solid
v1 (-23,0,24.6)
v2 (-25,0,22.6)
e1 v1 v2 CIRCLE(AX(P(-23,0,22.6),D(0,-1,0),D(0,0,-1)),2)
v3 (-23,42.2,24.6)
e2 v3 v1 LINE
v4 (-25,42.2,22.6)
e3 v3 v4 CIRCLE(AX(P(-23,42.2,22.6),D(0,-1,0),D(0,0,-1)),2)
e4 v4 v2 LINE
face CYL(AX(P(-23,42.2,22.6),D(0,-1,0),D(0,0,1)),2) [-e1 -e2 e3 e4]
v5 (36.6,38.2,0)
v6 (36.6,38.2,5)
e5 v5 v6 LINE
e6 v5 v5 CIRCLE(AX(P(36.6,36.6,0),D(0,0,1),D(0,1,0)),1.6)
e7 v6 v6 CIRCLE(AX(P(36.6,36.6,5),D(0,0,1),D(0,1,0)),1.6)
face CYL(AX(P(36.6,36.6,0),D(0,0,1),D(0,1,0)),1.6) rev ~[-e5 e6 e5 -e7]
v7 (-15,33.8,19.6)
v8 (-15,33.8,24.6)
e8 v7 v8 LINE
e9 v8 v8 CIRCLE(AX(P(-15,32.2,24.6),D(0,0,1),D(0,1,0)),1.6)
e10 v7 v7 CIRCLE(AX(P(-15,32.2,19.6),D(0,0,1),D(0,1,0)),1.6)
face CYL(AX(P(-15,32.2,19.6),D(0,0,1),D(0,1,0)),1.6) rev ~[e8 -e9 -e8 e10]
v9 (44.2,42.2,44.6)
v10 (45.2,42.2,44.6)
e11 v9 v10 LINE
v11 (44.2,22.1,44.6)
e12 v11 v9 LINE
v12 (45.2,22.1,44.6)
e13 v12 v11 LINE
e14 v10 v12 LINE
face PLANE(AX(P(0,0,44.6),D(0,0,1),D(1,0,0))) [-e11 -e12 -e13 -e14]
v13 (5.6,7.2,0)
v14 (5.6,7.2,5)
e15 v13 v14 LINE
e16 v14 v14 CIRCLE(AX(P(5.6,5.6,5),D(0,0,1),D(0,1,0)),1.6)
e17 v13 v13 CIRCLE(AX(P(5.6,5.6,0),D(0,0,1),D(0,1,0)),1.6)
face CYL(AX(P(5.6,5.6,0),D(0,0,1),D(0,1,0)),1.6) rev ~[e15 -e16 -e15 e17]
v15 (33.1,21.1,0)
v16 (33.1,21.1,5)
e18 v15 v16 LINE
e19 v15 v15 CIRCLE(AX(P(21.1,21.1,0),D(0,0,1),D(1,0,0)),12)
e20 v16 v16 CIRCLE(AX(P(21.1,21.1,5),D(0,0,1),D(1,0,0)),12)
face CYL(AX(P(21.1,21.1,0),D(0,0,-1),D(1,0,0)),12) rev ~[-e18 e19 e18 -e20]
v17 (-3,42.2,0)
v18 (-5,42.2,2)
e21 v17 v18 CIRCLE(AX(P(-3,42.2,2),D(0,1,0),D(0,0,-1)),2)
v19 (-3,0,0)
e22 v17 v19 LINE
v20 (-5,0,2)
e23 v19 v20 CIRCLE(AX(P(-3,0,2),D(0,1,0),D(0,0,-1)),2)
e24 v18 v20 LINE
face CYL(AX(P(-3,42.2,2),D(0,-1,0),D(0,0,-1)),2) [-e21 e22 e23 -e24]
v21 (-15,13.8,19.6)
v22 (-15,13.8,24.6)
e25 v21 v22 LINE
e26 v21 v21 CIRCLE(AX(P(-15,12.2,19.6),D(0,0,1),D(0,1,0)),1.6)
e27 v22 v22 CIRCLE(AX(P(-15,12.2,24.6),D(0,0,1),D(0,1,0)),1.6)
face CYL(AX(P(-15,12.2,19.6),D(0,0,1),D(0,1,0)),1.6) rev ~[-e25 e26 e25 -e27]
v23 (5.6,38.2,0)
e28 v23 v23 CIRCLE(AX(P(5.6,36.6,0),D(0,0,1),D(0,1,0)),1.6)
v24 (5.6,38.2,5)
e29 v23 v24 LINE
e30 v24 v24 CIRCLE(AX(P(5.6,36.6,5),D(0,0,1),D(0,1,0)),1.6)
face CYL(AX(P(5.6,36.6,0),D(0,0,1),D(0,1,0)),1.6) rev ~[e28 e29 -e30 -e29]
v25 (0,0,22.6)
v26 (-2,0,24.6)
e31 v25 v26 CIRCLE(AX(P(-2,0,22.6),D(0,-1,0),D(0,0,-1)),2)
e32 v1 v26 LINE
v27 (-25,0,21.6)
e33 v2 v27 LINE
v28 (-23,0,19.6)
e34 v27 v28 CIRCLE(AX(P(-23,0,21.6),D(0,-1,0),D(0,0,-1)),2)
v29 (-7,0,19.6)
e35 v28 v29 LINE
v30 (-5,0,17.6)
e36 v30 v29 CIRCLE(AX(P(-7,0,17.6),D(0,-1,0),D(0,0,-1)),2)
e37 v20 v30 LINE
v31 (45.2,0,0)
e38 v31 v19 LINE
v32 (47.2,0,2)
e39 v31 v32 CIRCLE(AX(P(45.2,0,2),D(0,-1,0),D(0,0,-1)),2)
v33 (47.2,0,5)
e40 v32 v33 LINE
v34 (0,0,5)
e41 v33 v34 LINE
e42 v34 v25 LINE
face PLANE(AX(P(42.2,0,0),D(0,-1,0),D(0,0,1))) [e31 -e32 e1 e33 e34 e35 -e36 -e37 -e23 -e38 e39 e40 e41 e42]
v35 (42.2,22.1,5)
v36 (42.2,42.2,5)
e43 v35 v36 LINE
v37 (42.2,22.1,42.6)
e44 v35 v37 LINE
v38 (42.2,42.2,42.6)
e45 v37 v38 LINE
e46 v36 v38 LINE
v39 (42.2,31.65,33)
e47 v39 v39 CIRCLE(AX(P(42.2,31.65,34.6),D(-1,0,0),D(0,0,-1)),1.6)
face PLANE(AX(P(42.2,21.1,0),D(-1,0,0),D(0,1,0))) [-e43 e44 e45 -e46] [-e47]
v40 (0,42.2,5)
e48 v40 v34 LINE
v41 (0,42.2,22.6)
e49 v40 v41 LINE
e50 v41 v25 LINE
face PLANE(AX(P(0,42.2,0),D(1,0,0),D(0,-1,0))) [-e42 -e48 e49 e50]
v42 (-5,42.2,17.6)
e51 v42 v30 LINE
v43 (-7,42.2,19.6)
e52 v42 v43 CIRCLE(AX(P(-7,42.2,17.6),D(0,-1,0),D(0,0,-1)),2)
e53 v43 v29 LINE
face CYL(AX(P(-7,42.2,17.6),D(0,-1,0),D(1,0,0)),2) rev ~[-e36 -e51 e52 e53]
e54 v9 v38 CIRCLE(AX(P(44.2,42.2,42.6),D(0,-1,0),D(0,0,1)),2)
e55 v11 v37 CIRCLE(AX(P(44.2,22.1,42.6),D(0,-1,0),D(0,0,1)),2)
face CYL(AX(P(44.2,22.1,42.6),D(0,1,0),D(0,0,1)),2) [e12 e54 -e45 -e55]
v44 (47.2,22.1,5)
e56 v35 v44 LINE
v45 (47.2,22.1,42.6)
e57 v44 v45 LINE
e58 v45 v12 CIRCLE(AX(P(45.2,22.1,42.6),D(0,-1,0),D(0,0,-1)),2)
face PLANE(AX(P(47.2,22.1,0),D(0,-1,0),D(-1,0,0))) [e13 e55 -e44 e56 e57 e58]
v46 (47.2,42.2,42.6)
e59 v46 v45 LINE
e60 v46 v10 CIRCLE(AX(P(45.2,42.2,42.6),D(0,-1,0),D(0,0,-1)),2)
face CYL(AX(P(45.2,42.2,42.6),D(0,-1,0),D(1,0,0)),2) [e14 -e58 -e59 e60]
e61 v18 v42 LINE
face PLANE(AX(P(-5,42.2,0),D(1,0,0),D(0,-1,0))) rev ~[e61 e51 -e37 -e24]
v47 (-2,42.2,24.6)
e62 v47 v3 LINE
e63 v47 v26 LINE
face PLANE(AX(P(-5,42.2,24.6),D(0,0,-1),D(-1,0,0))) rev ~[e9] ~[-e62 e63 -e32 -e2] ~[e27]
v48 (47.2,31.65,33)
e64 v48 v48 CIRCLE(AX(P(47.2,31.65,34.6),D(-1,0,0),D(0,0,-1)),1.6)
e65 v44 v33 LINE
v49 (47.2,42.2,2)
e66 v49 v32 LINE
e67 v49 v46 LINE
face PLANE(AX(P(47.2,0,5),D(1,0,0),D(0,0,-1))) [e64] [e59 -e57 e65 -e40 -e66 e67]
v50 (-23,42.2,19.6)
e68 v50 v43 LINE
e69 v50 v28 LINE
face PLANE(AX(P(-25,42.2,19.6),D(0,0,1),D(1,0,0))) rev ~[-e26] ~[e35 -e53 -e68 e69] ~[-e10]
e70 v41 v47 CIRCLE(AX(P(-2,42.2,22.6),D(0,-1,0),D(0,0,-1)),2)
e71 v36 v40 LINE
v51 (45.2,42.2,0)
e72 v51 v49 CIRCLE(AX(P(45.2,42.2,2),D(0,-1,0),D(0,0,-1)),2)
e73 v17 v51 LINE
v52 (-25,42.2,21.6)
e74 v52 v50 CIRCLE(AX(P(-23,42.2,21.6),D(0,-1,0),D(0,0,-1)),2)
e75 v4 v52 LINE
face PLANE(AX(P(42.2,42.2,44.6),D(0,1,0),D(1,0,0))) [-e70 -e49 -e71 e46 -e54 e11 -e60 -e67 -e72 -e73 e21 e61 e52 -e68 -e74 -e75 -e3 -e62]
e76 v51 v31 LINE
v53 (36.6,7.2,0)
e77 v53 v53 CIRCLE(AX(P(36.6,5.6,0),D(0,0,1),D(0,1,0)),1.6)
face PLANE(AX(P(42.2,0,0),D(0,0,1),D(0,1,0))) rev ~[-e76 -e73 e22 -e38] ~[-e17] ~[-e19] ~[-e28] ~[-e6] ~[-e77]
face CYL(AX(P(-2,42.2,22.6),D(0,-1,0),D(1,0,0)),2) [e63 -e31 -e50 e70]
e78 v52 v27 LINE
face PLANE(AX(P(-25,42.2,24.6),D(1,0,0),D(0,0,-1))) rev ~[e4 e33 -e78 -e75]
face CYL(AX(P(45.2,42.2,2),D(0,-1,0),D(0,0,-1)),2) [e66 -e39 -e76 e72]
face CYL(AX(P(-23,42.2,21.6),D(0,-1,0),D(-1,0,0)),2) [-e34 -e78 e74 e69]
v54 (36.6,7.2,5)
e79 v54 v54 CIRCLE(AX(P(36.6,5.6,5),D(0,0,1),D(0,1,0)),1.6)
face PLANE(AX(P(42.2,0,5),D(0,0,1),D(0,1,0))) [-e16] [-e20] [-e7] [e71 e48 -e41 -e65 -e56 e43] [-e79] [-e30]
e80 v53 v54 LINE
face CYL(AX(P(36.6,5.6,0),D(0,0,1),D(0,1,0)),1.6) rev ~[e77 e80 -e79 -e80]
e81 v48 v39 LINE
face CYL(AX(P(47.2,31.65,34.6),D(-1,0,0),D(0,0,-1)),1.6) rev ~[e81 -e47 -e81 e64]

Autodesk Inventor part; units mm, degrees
ref_plane "YZ Plane" through (0, 0, 0) normal (1, 0, 0) x (0, 1, 0)
ref_plane "XZ Plane" through (0, 0, 0) normal (0, 1, 0) x (-1, 0, 0)
ref_plane "XY Plane" through (0, 0, 0) normal (0, 0, 1) x (1, 0, 0)
sketch "Sketch1" plane through (0, 0, 0) normal (0, 0, 1) x (1, 0, 0)
  line L0 (0, 0) -> (42.2, 0)
  line L1 (42.2, 0) -> (42.2, 42.2)
  line L2 (42.2, 42.2) -> (0, 42.2)
  line L3 (0, 42.2) -> (0, 0)
  line L4 (0, 0) -> (5, 0)
  line L5 (42.2, 0) -> (45, 0)
  line L6 (5.6, 36.6) -> (36.6, 36.6) construction
  line L7 (36.6, 36.6) -> (36.6, 5.6) construction
  line L8 (36.6, 5.6) -> (5.6, 5.6) construction
  line L9 (5.6, 5.6) -> (5.6, 36.6) construction
  circle A0 centre (21.1, 21.1) radius 12
  line L10 (0.1, 42.1) -> (42.1, 42.1)
  line L11 (42.1, 42.1) -> (42.1, 0.1)
  line L12 (42.1, 0.1) -> (0.1, 0.1)
  line L13 (0.1, 0.1) -> (0.1, 42.1)
  line L14 (42.2, 42.2) -> (47.2, 42.2)
  line L15 (47.2, 42.2) -> (47.2, 21.1)
  line L16 (47.2, 21.1) -> (42.2, 21.1)
  line L17 (42.2, 21.1) -> (42.2, 42.2)
  line L18 (0, 42.2) -> (-5, 42.2)
  line L19 (-5, 42.2) -> (-5, 0)
  line L20 (-5, 0) -> (0, 0)
  line L21 (0, 0) -> (0, 42.2)
  point P0 (36.6, 21.1)
  point P1 (42.1, 21.1)
  point P2 (21.1, 36.6)
  point P3 (21.1, 42.1)
  point P4 (21.1, 42.2)
  dimension "d0" = 31
  dimension "d1" = 42
  dimension "d5" = 0.1
  dimension "d6" = 0.1
  dimension "d7" = 24
  dimension "d32" = 5
  dimension "d37" = 5
extrude "Extrusion2" add sketch "Sketch1" along normal blind 5 contours L3 L2 L1 L0 | L10 L11 L12 L13
extrude "Extrusion4" add sketch "Sketch1" along normal blind 44.6 contours L14 L15 L16 L1
extrude "Extrusion5" add sketch "Sketch1" along normal blind 24.6 contours L20 L19 L18 L3
hole "Hole1" at (5.6, 36.6, 0) at (36.6, 36.6, 0) at (36.6, 5.6, 0) at (5.6, 5.6, 0) direction (0, 0, 1) diameter 3.2 end through all
sketch "Sketch4" plane through (42.2, 42.2, 44.6) normal (0, 1, 0) x (1, 0, 0)
  line L0 (-47.2, 20) -> (-67.2, 20)
  line L1 (-67.2, 20) -> (-67.2, 25)
  line L2 (-67.2, 25) -> (-47.2, 25)
  line L3 (-47.2, 25) -> (-47.2, 20)
  point P0 (-42.2, 44.6)
  dimension "d42" = 20
  dimension "d43" = 5
extrude "Extrusion6" add sketch "Sketch4" against normal up to surface (42.2 mm away)
sketch "Sketch5" plane through (47.2, 21.1, 44.6) normal (1, 0, 0) x (0, 0, -1)
  line L0 (0, 0) -> (0, 21.1) projected
  line L1 (44.6, 21.1) -> (0, 21.1) projected
  line L2 (44.6, 0) -> (0, 0) projected
  point P0 (44.6, -21.1)
  point P1 (10, 10.55)
  point P2 (49.6, 26)
  point P3 (49.6, 0)
  dimension "d46" = 10
  dimension "d47" = 10.55
  dimension "d48" = 10.55
sketch "Sketch6" plane through (-5, 42.2, 19.6) normal (0, 0, -1) x (-1, 0, 0)
  line L0 (0, -42.2) -> (20, -42.2) projected
  line L1 (20, 0) -> (20, -42.2) projected
  line L2 (0, 0) -> (20, 0) projected
  line L3 (0, -42.2) -> (0, 0) projected
  point P0 (-5, -42.2)
  point P1 (10, -10)
  point P2 (10, -30)
  point P3 (10, -42.2)
  point P4 (10, 0)
  dimension "d49" = 10
  dimension "d65" = 20
hole "Hole3" at (-15, 32.2, 19.6) at (-15, 12.2, 19.6) direction (0, 0, 1) diameter 3.2 end through all
hole "Hole4" at (47.2, 31.65, 34.6) direction (-1, 0, 0) diameter 3.2 end through all
sketch "Sketch7" plane through (42.2, 0, 5) normal (1, 0, 0) x (0, 0, -1)
  line L0 (5, 21.1) -> (0, 21.1) projected
  line L1 (0, 0) -> (0, 21.1) projected
  line L2 (5, 0) -> (0, 0) projected
  line L3 (5, 0) -> (5, 21.1) projected
  point P0 (5, 0)
extrude "Extrusion7" add sketch "Sketch7" along normal blind 5
thicken "Thicken2" operation cut thickness 1 both sides no extend neighbours no toward (0, 1, 0) faces at (45.5333, 21.1, 18.2)
fillet "Fillet1" radius 2 8 edges at (0, 21.1, 24.6) (-25, 21.1, 24.6) (-25, 21.1, 19.6) (-5, 21.1, 19.6) (-5, 21.1, 0) (47.2, 21.1, 0) (42.2, 32.15, 44.6) (47.2, 32.15, 44.6)
equation "\"d6\" = d5"
equation "\"d47\" = d48"
properties part number "Motor Mount"
